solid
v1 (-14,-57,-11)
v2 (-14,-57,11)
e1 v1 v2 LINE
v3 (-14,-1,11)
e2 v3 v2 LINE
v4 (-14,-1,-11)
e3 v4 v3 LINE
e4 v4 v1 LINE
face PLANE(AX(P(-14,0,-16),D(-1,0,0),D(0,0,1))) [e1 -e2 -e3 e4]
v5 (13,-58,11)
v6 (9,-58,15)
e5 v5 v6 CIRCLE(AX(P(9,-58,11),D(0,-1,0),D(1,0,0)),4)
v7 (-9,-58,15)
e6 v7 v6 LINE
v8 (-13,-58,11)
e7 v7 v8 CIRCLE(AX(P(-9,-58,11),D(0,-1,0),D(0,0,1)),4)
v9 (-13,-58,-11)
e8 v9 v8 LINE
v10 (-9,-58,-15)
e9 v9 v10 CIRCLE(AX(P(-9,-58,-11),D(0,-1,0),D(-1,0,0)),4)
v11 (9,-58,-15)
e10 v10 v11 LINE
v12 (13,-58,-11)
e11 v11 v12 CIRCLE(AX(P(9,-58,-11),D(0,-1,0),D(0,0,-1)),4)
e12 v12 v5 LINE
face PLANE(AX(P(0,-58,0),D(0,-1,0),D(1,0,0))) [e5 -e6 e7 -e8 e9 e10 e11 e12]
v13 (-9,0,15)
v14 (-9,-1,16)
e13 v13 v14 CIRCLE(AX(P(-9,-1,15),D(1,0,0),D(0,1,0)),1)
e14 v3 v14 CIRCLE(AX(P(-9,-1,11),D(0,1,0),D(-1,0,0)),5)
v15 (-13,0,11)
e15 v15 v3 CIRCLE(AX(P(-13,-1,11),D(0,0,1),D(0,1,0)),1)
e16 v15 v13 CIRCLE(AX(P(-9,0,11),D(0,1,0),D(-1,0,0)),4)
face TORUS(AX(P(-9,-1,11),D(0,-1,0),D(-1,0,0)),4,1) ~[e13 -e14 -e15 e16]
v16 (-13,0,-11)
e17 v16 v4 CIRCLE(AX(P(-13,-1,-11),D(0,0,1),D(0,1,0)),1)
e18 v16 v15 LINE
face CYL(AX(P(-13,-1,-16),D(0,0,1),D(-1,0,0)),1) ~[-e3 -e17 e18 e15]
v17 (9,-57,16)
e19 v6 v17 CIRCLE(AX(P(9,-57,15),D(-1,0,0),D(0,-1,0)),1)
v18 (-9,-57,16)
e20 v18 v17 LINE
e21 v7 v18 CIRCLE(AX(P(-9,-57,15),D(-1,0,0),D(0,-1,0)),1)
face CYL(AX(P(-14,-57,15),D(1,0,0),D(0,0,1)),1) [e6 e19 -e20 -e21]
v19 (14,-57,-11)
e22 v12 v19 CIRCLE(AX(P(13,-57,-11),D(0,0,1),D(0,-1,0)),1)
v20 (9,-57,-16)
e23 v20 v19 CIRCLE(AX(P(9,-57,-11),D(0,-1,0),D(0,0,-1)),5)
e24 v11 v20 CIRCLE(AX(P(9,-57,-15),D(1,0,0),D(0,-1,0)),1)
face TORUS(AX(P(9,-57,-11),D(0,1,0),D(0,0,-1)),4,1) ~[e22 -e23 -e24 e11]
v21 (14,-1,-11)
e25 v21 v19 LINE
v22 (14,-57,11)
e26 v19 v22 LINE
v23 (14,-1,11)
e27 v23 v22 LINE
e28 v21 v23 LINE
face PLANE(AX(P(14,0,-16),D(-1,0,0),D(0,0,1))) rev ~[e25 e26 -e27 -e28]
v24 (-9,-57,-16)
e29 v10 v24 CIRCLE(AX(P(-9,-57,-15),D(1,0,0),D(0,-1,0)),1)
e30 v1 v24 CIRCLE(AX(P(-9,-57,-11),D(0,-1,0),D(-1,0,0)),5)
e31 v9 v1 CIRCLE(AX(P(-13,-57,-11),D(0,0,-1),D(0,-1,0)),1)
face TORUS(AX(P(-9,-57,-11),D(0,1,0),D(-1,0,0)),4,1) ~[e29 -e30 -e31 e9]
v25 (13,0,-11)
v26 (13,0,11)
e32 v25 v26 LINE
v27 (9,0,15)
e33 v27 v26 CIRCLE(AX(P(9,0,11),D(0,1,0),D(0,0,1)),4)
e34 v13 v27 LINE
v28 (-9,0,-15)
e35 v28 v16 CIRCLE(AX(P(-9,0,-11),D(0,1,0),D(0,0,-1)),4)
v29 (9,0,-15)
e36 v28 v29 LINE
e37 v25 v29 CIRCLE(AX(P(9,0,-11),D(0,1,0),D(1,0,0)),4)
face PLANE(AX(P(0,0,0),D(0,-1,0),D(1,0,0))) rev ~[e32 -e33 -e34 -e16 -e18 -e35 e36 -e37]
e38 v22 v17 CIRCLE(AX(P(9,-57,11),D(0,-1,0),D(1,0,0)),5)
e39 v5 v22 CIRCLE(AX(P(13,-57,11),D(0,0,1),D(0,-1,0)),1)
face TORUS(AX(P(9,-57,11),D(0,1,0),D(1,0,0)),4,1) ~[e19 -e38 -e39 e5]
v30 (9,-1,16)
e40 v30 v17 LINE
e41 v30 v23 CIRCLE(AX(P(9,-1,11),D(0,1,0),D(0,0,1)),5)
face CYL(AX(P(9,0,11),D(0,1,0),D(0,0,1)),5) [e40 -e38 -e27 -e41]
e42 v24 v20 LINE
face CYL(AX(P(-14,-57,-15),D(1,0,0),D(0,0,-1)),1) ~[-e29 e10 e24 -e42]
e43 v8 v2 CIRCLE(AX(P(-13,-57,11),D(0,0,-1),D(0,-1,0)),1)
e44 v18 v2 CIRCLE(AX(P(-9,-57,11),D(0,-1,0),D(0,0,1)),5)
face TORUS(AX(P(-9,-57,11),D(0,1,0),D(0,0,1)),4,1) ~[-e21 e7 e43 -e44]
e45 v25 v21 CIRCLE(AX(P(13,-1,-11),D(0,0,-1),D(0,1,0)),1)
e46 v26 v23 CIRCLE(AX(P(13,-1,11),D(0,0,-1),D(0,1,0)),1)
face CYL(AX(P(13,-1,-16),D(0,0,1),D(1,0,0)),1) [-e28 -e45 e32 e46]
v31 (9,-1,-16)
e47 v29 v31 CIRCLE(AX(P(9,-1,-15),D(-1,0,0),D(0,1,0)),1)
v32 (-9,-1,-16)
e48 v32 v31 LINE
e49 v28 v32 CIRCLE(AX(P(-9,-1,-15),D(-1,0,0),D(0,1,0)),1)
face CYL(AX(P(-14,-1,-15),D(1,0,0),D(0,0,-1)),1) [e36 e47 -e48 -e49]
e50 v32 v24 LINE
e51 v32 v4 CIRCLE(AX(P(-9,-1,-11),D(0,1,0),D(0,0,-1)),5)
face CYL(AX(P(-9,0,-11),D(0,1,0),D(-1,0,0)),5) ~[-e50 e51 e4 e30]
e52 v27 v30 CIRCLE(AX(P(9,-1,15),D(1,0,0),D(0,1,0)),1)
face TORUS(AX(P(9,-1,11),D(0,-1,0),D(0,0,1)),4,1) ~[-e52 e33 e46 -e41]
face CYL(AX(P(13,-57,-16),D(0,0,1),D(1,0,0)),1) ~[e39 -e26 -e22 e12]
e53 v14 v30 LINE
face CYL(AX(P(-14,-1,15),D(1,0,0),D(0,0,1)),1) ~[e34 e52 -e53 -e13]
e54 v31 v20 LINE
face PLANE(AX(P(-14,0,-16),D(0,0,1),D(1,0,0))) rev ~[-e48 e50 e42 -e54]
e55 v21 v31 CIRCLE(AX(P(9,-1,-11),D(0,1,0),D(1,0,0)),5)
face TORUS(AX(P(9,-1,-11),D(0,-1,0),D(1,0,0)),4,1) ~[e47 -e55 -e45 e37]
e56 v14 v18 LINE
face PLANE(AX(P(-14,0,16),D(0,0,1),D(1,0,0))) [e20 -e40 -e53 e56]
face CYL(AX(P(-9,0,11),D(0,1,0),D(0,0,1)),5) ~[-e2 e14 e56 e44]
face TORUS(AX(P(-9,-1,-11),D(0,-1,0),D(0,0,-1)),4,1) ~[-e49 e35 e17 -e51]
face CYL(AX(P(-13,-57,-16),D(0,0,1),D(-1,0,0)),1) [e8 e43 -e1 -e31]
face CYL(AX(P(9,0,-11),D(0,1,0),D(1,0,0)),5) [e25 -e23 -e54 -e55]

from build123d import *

# Parameters (mm, degrees)
F0_W         = 28
F0_H         = 32
F1_DEPTH     = 58
F2_R         = 1
F3_T1_DEPTH  = 58
F3_T4_ANGLE  = 90
F3_T6_ANGLE  = 90
F3_T8_ANGLE  = 90
F3_T10_ANGLE = 90
F3_T12_ANGLE = 90
F3_T14_ANGLE = 90
F3_T16_ANGLE = 90
F3_T18_ANGLE = 90


# Not quite as in the source:
# - a fillet or chamfer that OpenCascade refuses, or shapes differently, is made with other operations: its cross-section is extruded or revolved along the edge and cut away or added


with BuildPart() as f1:
    # F0 (on Front) → F1 (new body)
    with BuildSketch(Plane.XZ):
        Rectangle(F0_W, F0_H)
    extrude(amount=F1_DEPTH)

    # F2
    f2_edges = [f1.edges().sort_by_distance(p)[0] for p in [
        (0, -58, 16),
        (14, -58, 0),
        (0, -58, -16),
        (-14, -58, 0),
        (14, 0, 0),
        (0, 0, 16),
        (0, 0, -16),
        (-14, 0, 0),
    ]]
    fillet(f2_edges, radius=F2_R)

    # F3: fillet of radius 5 on 4 edges, made by hand

    # F3_s2 → F3_t1 (cut)
    with BuildSketch(Plane.XZ):
        with BuildLine():
            ThreePointArc((9, 16), (12.5355339059, 14.5355339059), (14, 11))
            Line((14, 11), (14, 16))
            Line((14, 16), (9, 16))
        make_face()
        with BuildLine():
            ThreePointArc((-9, 16), (-12.5355339059, 14.5355339059), (-14, 11))
            Line((-14, 11), (-14, 16))
            Line((-14, 16), (-9, 16))
        make_face()
        with BuildLine():
            ThreePointArc((14, -11), (12.5355339059, -14.5355339059), (9, -16))
            Line((9, -16), (14, -16))
            Line((14, -16), (14, -11))
        make_face()
        with BuildLine():
            ThreePointArc((-14, -11), (-12.5355339059, -14.5355339059), (-9, -16))
            Line((-9, -16), (-14, -16))
            Line((-14, -16), (-14, -11))
        make_face()
    extrude(amount=F3_T1_DEPTH, mode=Mode.SUBTRACT)

    # F3_s3 → F3_t4 (revolve, cut)
    with BuildSketch(Plane.YZ.offset(-9)):
        with BuildLine():
            ThreePointArc((0, -15), (-0.2928932188, -15.7071067812), (-1, -16))
            Line((-1, -16), (0, -16))
            Line((0, -16), (0, -15))
        make_face()
    revolve(axis=Axis((-9, 0, -11), (0, 1, 0)), revolution_arc=F3_T4_ANGLE, mode=Mode.SUBTRACT)

    # F3_s5 → F3_t6 (revolve, cut)
    with BuildSketch(Plane.XY.offset(-11)):
        with BuildLine():
            ThreePointArc((-13, -58), (-13.7071067812, -57.7071067812), (-14, -57))
            Line((-14, -57), (-14, -58))
            Line((-14, -58), (-13, -58))
        make_face()
    revolve(axis=Axis((-9, -58, -11), (0, -1, 0)), revolution_arc=F3_T6_ANGLE, mode=Mode.SUBTRACT)

    # F3_s7 → F3_t8 (revolve, cut)
    with BuildSketch(Plane.XY.offset(-11)):
        with BuildLine():
            ThreePointArc((13, 0), (13.7071067812, -0.2928932188), (14, -1))
            Line((14, -1), (14, 0))
            Line((14, 0), (13, 0))
        make_face()
    revolve(axis=Axis((9, 0, -11), (0, 1, 0)), revolution_arc=F3_T8_ANGLE, mode=Mode.SUBTRACT)

    # F3_s9 → F3_t10 (revolve, cut)
    with BuildSketch(Plane.YZ.offset(9)):
        with BuildLine():
            ThreePointArc((-58, -15), (-57.7071067812, -15.7071067812), (-57, -16))
            Line((-57, -16), (-58, -16))
            Line((-58, -16), (-58, -15))
        make_face()
    revolve(axis=Axis((9, -58, -11), (0, -1, 0)), revolution_arc=F3_T10_ANGLE, mode=Mode.SUBTRACT)

    # F3_s11 → F3_t12 (revolve, cut)
    with BuildSketch(Plane.XY.offset(11)):
        with BuildLine():
            ThreePointArc((-13, 0), (-13.7071067812, -0.2928932188), (-14, -1))
            Line((-14, -1), (-14, 0))
            Line((-14, 0), (-13, 0))
        make_face()
    revolve(axis=Axis((-9, 0, 11), (0, 1, 0)), revolution_arc=F3_T12_ANGLE, mode=Mode.SUBTRACT)

    # F3_s13 → F3_t14 (revolve, cut)
    with BuildSketch(Plane.YZ.offset(-9)):
        with BuildLine():
            ThreePointArc((-58, 15), (-57.7071067812, 15.7071067812), (-57, 16))
            Line((-57, 16), (-58, 16))
            Line((-58, 16), (-58, 15))
        make_face()
    revolve(axis=Axis((-9, -58, 11), (0, -1, 0)), revolution_arc=F3_T14_ANGLE, mode=Mode.SUBTRACT)

    # F3_s15 → F3_t16 (revolve, cut)
    with BuildSketch(Plane.YZ.offset(9)):
        with BuildLine():
            ThreePointArc((0, 15), (-0.2928932188, 15.7071067812), (-1, 16))
            Line((-1, 16), (0, 16))
            Line((0, 16), (0, 15))
        make_face()
    revolve(axis=Axis((9, 0, 11), (0, 1, 0)), revolution_arc=F3_T16_ANGLE, mode=Mode.SUBTRACT)

    # F3_s17 → F3_t18 (revolve, cut)
    with BuildSketch(Plane.XY.offset(11)):
        with BuildLine():
            ThreePointArc((13, -58), (13.7071067812, -57.7071067812), (14, -57))
            Line((14, -57), (14, -58))
            Line((14, -58), (13, -58))
        make_face()
    revolve(axis=Axis((9, -58, 11), (0, -1, 0)), revolution_arc=F3_T18_ANGLE, mode=Mode.SUBTRACT)


solid = f1.part
